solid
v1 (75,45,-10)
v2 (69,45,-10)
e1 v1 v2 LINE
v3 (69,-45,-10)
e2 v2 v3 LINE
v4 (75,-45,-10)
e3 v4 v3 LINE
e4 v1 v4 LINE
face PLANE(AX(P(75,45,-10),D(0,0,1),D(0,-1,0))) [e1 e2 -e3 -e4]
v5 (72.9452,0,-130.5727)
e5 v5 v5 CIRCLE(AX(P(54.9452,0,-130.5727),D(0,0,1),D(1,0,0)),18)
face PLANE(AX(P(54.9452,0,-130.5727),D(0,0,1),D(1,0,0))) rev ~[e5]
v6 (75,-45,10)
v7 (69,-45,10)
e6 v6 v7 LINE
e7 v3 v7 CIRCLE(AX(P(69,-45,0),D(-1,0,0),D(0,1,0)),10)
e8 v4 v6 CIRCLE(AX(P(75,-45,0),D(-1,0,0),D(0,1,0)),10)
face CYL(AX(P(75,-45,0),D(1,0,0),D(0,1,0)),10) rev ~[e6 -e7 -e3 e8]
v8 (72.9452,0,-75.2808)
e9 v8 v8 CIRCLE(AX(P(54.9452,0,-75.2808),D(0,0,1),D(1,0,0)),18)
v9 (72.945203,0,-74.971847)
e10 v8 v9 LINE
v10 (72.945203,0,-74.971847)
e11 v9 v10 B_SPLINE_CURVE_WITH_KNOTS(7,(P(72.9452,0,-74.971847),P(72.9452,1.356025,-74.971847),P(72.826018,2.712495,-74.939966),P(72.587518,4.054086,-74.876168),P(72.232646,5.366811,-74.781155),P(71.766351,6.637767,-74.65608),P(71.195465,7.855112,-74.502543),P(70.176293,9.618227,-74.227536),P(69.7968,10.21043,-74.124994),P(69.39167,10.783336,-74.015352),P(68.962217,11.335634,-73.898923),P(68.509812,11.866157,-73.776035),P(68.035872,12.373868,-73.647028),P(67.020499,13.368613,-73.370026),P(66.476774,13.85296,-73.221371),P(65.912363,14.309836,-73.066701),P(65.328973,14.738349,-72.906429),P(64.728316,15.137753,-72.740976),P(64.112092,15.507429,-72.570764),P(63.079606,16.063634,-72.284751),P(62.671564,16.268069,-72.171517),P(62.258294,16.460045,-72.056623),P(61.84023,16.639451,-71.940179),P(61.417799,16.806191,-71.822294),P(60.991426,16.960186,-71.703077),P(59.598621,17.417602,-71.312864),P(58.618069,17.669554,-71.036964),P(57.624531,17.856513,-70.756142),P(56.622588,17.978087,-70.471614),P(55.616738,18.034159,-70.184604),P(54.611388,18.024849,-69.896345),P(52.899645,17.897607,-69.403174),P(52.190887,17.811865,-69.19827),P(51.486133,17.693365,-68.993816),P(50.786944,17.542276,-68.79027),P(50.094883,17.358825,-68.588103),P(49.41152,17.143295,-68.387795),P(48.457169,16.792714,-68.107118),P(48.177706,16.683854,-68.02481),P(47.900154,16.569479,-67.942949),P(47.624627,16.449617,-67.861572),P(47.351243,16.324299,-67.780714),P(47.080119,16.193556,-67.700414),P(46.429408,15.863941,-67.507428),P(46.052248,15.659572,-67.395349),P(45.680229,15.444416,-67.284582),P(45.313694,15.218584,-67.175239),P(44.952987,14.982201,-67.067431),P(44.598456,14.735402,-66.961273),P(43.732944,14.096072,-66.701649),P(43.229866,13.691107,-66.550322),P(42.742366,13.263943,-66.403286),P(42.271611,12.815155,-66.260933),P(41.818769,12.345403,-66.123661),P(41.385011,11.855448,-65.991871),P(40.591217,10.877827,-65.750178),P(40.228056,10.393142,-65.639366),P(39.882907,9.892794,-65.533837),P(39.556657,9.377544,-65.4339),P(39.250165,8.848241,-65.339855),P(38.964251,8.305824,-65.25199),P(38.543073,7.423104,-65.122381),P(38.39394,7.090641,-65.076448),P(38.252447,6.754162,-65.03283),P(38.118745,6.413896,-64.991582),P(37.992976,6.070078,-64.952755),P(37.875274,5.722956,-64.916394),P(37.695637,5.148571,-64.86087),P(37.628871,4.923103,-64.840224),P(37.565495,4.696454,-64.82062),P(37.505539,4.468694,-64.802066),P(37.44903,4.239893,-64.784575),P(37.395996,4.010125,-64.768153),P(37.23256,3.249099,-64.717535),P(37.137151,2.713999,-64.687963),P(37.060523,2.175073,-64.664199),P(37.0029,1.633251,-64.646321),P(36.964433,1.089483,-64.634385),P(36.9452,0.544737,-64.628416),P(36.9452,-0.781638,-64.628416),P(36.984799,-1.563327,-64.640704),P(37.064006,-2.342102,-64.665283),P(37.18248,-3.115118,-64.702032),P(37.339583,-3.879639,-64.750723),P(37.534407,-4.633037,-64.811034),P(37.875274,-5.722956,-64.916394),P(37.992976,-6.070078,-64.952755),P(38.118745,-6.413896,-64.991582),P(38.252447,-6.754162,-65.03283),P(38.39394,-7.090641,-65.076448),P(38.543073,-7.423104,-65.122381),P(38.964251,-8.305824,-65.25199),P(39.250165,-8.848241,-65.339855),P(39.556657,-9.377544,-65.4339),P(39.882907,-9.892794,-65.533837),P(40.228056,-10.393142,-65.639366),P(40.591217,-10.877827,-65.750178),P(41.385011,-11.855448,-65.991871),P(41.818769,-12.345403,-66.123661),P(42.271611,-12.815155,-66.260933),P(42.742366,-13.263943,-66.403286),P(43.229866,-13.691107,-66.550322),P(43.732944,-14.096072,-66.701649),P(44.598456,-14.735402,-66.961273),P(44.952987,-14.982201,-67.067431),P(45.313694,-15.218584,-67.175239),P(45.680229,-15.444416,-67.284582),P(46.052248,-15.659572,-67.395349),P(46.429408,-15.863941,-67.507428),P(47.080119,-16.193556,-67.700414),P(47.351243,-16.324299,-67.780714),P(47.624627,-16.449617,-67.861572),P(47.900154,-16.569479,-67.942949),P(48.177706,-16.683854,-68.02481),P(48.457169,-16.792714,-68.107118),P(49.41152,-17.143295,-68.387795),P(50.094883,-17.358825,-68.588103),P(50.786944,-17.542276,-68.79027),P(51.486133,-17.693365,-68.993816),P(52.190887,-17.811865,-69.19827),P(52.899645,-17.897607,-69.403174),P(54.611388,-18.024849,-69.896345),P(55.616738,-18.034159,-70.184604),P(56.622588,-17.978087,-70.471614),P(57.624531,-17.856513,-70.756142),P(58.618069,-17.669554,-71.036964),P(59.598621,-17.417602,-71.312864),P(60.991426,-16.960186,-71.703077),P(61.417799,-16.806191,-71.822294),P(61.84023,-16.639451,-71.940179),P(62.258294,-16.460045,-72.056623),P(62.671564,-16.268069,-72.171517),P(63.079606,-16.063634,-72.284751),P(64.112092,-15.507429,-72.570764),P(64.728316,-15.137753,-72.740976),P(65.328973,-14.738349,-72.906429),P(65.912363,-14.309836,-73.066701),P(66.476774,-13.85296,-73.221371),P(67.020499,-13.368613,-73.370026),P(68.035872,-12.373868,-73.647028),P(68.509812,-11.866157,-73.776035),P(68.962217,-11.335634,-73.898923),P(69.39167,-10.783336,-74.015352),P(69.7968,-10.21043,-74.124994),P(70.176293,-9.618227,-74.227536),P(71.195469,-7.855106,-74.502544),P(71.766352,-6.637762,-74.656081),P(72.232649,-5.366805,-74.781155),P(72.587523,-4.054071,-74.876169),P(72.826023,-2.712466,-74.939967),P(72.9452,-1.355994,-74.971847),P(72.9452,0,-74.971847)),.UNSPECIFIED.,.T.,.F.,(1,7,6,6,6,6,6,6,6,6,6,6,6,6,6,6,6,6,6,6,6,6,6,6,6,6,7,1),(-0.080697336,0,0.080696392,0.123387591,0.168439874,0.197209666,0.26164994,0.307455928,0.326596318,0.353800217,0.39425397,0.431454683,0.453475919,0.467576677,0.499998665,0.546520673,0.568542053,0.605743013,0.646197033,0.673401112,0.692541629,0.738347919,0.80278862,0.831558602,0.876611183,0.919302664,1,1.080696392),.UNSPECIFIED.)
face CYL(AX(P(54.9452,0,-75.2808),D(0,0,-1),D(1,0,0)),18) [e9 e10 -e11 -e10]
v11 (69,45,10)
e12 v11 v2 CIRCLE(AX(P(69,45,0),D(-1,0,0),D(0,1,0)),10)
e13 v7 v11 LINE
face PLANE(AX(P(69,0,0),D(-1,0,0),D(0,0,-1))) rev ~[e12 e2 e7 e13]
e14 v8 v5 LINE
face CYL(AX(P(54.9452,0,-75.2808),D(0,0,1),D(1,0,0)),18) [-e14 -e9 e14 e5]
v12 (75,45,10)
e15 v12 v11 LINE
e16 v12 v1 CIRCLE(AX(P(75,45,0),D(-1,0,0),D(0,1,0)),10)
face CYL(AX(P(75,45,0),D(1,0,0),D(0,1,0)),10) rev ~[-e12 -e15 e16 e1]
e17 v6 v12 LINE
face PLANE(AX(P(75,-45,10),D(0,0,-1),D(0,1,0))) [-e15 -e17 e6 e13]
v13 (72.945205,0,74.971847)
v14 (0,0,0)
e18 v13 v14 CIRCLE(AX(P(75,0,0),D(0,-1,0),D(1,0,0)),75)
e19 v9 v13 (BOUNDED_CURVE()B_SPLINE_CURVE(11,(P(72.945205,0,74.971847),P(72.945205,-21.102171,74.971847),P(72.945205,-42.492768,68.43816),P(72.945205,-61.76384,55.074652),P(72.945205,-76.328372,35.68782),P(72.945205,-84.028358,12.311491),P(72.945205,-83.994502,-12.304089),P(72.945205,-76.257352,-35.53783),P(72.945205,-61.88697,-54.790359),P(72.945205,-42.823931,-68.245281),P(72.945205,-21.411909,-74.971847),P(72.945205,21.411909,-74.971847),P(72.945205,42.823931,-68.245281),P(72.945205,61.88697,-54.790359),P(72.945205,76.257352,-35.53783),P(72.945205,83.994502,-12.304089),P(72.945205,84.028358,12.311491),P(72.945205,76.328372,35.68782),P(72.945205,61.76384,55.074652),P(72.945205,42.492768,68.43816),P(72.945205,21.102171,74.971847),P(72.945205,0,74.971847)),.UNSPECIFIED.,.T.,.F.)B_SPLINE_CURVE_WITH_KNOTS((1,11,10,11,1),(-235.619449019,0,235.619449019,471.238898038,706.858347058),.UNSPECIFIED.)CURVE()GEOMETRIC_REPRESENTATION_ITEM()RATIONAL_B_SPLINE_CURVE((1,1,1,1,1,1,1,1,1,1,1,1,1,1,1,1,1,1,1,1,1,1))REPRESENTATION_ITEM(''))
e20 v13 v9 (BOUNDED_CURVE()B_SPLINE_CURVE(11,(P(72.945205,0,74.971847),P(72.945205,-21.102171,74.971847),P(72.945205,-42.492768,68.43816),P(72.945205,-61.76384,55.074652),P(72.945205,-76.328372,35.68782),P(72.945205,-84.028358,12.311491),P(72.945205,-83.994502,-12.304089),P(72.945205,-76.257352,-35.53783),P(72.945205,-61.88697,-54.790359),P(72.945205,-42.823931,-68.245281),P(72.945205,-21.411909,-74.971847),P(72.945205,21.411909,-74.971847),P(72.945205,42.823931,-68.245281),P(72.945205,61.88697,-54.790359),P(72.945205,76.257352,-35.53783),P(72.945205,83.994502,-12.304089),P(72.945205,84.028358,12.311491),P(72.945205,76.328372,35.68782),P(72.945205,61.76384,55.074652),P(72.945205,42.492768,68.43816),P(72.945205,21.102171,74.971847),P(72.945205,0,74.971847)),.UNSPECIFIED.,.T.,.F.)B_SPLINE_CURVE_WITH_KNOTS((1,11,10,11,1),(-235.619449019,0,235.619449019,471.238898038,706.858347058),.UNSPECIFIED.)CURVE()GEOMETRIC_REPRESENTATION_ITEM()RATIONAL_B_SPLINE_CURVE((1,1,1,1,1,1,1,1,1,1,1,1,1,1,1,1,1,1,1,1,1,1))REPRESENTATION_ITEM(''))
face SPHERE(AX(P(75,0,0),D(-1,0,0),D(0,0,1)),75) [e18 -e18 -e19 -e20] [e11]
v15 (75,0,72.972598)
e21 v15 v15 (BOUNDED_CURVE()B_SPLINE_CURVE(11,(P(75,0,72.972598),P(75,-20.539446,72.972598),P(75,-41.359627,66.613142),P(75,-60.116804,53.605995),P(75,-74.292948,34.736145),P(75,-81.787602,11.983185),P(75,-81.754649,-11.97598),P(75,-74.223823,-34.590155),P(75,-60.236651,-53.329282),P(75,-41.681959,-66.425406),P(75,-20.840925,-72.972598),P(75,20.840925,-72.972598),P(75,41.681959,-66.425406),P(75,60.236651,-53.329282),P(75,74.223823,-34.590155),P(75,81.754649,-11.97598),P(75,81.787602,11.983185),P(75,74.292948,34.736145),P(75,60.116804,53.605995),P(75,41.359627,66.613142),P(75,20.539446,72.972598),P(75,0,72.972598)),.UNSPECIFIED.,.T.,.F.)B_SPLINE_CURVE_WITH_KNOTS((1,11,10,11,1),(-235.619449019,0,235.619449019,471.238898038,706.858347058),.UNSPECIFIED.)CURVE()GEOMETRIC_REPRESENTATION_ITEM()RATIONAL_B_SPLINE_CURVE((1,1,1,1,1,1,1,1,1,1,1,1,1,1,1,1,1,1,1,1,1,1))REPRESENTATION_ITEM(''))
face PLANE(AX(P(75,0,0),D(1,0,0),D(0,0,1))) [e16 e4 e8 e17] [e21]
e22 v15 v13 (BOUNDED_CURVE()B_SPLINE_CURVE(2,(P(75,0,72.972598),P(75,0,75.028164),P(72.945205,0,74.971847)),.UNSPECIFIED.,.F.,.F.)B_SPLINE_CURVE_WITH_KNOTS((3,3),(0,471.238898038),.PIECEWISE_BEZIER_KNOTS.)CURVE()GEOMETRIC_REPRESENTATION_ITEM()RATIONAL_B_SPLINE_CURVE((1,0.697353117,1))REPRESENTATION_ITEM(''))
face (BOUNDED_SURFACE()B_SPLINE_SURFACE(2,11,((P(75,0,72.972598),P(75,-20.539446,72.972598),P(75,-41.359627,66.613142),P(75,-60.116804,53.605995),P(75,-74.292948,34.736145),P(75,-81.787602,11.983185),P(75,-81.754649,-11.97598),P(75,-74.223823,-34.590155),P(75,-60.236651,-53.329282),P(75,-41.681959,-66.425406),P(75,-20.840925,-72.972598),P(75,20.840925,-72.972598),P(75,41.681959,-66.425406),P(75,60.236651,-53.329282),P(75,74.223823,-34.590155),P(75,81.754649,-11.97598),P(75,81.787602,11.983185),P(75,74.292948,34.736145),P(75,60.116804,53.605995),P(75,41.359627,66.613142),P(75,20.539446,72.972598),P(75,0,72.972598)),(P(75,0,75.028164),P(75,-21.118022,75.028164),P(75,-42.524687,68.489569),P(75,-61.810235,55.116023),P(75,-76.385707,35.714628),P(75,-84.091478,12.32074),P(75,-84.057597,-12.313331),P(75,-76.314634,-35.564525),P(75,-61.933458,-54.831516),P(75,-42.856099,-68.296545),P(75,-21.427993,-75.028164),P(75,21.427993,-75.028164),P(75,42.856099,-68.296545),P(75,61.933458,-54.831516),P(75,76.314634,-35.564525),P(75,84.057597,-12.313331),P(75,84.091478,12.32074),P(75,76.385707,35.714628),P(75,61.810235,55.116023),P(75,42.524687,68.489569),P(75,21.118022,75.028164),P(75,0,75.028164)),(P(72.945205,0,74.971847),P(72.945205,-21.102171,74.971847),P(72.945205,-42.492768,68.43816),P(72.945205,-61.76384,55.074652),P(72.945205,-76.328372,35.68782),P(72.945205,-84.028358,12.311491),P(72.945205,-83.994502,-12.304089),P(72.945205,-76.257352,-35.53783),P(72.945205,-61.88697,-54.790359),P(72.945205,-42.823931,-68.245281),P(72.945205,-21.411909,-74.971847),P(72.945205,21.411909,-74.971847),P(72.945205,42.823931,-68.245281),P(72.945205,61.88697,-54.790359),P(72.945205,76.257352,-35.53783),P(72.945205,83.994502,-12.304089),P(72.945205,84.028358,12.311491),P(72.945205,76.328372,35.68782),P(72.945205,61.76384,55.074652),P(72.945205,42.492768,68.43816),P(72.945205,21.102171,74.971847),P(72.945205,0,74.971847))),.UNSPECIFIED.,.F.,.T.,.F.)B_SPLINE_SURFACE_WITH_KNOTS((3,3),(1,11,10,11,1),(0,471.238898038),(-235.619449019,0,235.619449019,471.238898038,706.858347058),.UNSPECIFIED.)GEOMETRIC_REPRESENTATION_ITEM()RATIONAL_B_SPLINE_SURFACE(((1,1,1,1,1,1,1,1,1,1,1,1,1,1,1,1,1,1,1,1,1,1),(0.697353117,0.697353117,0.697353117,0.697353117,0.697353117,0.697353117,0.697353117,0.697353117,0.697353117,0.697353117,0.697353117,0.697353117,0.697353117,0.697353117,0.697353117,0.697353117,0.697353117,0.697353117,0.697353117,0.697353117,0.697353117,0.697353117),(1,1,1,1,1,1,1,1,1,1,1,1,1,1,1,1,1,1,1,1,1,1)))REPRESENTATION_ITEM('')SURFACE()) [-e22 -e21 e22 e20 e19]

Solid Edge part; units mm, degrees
sketch "Sketch1" plane through (0, 0, 0) normal (0, -1, 0) x (1, 0, 0)
  line L0 (75, 75) -> (75, 0)
  line L1 (0, 0) -> (75, 0)
  arc A0 (75, 75) -> (0, 0) centre (75, 0) ccw
revolve "RevolvedProtrusion1" add sketch "Sketch1" angle 360 about axis through (0, 0, 0) along (1, 0, 0)
fillet "Round1" radius 2 1 edges at (75, 0, -75)
sketch "Sketch2" plane through (75, 0, 0) normal (1, 0, 0) x (0, 1, 0)
  line L0 (0, 6) -> (-45, 6)
  line L1 (0, 6) -> (45, 6)
  arc A0 (45, 6) -> (45, -6) centre (45, 0) cw
  line L2 (-45, -6) -> (45, -6)
  arc A1 (-45, -6) -> (-45, 6) centre (-45, 0) cw
extrude "ExtrudedCutout_1" cut sketch "Sketch2" against normal blind 5.8387
sketch "Sketch3" plane through (0, 0, -75.2808) normal (0, 0, 1) x (1, 0, 0)
  circle A0 centre (54.9452, 0) radius 18
extrude "ExtrudedProtrusion_4" add sketch "Sketch3" along normal blind 29
sketch "Sketch4" plane through (0, 0, -75.2808) normal (0, 0, 1) x (1, 0, 0)
  circle A0 centre (54.9452, 0) radius 18
extrude "ExtrudedProtrusion_3" add sketch "Sketch4" against normal blind 55.2919
sketch "Sketch5" plane through (75, 0, 0) normal (1, 0, 0) x (0, 1, 0)
  line L0 (-45, 10) -> (45, 10)
  line L1 (45, -10) -> (-45, -10)
  arc A0 (45, 10) -> (45, -10) centre (45, 0) cw
  arc A1 (-45, -10) -> (-45, 10) centre (-45, 0) cw
extrude "ExtrudedCutout_3" cut sketch "Sketch5" against normal blind 6
